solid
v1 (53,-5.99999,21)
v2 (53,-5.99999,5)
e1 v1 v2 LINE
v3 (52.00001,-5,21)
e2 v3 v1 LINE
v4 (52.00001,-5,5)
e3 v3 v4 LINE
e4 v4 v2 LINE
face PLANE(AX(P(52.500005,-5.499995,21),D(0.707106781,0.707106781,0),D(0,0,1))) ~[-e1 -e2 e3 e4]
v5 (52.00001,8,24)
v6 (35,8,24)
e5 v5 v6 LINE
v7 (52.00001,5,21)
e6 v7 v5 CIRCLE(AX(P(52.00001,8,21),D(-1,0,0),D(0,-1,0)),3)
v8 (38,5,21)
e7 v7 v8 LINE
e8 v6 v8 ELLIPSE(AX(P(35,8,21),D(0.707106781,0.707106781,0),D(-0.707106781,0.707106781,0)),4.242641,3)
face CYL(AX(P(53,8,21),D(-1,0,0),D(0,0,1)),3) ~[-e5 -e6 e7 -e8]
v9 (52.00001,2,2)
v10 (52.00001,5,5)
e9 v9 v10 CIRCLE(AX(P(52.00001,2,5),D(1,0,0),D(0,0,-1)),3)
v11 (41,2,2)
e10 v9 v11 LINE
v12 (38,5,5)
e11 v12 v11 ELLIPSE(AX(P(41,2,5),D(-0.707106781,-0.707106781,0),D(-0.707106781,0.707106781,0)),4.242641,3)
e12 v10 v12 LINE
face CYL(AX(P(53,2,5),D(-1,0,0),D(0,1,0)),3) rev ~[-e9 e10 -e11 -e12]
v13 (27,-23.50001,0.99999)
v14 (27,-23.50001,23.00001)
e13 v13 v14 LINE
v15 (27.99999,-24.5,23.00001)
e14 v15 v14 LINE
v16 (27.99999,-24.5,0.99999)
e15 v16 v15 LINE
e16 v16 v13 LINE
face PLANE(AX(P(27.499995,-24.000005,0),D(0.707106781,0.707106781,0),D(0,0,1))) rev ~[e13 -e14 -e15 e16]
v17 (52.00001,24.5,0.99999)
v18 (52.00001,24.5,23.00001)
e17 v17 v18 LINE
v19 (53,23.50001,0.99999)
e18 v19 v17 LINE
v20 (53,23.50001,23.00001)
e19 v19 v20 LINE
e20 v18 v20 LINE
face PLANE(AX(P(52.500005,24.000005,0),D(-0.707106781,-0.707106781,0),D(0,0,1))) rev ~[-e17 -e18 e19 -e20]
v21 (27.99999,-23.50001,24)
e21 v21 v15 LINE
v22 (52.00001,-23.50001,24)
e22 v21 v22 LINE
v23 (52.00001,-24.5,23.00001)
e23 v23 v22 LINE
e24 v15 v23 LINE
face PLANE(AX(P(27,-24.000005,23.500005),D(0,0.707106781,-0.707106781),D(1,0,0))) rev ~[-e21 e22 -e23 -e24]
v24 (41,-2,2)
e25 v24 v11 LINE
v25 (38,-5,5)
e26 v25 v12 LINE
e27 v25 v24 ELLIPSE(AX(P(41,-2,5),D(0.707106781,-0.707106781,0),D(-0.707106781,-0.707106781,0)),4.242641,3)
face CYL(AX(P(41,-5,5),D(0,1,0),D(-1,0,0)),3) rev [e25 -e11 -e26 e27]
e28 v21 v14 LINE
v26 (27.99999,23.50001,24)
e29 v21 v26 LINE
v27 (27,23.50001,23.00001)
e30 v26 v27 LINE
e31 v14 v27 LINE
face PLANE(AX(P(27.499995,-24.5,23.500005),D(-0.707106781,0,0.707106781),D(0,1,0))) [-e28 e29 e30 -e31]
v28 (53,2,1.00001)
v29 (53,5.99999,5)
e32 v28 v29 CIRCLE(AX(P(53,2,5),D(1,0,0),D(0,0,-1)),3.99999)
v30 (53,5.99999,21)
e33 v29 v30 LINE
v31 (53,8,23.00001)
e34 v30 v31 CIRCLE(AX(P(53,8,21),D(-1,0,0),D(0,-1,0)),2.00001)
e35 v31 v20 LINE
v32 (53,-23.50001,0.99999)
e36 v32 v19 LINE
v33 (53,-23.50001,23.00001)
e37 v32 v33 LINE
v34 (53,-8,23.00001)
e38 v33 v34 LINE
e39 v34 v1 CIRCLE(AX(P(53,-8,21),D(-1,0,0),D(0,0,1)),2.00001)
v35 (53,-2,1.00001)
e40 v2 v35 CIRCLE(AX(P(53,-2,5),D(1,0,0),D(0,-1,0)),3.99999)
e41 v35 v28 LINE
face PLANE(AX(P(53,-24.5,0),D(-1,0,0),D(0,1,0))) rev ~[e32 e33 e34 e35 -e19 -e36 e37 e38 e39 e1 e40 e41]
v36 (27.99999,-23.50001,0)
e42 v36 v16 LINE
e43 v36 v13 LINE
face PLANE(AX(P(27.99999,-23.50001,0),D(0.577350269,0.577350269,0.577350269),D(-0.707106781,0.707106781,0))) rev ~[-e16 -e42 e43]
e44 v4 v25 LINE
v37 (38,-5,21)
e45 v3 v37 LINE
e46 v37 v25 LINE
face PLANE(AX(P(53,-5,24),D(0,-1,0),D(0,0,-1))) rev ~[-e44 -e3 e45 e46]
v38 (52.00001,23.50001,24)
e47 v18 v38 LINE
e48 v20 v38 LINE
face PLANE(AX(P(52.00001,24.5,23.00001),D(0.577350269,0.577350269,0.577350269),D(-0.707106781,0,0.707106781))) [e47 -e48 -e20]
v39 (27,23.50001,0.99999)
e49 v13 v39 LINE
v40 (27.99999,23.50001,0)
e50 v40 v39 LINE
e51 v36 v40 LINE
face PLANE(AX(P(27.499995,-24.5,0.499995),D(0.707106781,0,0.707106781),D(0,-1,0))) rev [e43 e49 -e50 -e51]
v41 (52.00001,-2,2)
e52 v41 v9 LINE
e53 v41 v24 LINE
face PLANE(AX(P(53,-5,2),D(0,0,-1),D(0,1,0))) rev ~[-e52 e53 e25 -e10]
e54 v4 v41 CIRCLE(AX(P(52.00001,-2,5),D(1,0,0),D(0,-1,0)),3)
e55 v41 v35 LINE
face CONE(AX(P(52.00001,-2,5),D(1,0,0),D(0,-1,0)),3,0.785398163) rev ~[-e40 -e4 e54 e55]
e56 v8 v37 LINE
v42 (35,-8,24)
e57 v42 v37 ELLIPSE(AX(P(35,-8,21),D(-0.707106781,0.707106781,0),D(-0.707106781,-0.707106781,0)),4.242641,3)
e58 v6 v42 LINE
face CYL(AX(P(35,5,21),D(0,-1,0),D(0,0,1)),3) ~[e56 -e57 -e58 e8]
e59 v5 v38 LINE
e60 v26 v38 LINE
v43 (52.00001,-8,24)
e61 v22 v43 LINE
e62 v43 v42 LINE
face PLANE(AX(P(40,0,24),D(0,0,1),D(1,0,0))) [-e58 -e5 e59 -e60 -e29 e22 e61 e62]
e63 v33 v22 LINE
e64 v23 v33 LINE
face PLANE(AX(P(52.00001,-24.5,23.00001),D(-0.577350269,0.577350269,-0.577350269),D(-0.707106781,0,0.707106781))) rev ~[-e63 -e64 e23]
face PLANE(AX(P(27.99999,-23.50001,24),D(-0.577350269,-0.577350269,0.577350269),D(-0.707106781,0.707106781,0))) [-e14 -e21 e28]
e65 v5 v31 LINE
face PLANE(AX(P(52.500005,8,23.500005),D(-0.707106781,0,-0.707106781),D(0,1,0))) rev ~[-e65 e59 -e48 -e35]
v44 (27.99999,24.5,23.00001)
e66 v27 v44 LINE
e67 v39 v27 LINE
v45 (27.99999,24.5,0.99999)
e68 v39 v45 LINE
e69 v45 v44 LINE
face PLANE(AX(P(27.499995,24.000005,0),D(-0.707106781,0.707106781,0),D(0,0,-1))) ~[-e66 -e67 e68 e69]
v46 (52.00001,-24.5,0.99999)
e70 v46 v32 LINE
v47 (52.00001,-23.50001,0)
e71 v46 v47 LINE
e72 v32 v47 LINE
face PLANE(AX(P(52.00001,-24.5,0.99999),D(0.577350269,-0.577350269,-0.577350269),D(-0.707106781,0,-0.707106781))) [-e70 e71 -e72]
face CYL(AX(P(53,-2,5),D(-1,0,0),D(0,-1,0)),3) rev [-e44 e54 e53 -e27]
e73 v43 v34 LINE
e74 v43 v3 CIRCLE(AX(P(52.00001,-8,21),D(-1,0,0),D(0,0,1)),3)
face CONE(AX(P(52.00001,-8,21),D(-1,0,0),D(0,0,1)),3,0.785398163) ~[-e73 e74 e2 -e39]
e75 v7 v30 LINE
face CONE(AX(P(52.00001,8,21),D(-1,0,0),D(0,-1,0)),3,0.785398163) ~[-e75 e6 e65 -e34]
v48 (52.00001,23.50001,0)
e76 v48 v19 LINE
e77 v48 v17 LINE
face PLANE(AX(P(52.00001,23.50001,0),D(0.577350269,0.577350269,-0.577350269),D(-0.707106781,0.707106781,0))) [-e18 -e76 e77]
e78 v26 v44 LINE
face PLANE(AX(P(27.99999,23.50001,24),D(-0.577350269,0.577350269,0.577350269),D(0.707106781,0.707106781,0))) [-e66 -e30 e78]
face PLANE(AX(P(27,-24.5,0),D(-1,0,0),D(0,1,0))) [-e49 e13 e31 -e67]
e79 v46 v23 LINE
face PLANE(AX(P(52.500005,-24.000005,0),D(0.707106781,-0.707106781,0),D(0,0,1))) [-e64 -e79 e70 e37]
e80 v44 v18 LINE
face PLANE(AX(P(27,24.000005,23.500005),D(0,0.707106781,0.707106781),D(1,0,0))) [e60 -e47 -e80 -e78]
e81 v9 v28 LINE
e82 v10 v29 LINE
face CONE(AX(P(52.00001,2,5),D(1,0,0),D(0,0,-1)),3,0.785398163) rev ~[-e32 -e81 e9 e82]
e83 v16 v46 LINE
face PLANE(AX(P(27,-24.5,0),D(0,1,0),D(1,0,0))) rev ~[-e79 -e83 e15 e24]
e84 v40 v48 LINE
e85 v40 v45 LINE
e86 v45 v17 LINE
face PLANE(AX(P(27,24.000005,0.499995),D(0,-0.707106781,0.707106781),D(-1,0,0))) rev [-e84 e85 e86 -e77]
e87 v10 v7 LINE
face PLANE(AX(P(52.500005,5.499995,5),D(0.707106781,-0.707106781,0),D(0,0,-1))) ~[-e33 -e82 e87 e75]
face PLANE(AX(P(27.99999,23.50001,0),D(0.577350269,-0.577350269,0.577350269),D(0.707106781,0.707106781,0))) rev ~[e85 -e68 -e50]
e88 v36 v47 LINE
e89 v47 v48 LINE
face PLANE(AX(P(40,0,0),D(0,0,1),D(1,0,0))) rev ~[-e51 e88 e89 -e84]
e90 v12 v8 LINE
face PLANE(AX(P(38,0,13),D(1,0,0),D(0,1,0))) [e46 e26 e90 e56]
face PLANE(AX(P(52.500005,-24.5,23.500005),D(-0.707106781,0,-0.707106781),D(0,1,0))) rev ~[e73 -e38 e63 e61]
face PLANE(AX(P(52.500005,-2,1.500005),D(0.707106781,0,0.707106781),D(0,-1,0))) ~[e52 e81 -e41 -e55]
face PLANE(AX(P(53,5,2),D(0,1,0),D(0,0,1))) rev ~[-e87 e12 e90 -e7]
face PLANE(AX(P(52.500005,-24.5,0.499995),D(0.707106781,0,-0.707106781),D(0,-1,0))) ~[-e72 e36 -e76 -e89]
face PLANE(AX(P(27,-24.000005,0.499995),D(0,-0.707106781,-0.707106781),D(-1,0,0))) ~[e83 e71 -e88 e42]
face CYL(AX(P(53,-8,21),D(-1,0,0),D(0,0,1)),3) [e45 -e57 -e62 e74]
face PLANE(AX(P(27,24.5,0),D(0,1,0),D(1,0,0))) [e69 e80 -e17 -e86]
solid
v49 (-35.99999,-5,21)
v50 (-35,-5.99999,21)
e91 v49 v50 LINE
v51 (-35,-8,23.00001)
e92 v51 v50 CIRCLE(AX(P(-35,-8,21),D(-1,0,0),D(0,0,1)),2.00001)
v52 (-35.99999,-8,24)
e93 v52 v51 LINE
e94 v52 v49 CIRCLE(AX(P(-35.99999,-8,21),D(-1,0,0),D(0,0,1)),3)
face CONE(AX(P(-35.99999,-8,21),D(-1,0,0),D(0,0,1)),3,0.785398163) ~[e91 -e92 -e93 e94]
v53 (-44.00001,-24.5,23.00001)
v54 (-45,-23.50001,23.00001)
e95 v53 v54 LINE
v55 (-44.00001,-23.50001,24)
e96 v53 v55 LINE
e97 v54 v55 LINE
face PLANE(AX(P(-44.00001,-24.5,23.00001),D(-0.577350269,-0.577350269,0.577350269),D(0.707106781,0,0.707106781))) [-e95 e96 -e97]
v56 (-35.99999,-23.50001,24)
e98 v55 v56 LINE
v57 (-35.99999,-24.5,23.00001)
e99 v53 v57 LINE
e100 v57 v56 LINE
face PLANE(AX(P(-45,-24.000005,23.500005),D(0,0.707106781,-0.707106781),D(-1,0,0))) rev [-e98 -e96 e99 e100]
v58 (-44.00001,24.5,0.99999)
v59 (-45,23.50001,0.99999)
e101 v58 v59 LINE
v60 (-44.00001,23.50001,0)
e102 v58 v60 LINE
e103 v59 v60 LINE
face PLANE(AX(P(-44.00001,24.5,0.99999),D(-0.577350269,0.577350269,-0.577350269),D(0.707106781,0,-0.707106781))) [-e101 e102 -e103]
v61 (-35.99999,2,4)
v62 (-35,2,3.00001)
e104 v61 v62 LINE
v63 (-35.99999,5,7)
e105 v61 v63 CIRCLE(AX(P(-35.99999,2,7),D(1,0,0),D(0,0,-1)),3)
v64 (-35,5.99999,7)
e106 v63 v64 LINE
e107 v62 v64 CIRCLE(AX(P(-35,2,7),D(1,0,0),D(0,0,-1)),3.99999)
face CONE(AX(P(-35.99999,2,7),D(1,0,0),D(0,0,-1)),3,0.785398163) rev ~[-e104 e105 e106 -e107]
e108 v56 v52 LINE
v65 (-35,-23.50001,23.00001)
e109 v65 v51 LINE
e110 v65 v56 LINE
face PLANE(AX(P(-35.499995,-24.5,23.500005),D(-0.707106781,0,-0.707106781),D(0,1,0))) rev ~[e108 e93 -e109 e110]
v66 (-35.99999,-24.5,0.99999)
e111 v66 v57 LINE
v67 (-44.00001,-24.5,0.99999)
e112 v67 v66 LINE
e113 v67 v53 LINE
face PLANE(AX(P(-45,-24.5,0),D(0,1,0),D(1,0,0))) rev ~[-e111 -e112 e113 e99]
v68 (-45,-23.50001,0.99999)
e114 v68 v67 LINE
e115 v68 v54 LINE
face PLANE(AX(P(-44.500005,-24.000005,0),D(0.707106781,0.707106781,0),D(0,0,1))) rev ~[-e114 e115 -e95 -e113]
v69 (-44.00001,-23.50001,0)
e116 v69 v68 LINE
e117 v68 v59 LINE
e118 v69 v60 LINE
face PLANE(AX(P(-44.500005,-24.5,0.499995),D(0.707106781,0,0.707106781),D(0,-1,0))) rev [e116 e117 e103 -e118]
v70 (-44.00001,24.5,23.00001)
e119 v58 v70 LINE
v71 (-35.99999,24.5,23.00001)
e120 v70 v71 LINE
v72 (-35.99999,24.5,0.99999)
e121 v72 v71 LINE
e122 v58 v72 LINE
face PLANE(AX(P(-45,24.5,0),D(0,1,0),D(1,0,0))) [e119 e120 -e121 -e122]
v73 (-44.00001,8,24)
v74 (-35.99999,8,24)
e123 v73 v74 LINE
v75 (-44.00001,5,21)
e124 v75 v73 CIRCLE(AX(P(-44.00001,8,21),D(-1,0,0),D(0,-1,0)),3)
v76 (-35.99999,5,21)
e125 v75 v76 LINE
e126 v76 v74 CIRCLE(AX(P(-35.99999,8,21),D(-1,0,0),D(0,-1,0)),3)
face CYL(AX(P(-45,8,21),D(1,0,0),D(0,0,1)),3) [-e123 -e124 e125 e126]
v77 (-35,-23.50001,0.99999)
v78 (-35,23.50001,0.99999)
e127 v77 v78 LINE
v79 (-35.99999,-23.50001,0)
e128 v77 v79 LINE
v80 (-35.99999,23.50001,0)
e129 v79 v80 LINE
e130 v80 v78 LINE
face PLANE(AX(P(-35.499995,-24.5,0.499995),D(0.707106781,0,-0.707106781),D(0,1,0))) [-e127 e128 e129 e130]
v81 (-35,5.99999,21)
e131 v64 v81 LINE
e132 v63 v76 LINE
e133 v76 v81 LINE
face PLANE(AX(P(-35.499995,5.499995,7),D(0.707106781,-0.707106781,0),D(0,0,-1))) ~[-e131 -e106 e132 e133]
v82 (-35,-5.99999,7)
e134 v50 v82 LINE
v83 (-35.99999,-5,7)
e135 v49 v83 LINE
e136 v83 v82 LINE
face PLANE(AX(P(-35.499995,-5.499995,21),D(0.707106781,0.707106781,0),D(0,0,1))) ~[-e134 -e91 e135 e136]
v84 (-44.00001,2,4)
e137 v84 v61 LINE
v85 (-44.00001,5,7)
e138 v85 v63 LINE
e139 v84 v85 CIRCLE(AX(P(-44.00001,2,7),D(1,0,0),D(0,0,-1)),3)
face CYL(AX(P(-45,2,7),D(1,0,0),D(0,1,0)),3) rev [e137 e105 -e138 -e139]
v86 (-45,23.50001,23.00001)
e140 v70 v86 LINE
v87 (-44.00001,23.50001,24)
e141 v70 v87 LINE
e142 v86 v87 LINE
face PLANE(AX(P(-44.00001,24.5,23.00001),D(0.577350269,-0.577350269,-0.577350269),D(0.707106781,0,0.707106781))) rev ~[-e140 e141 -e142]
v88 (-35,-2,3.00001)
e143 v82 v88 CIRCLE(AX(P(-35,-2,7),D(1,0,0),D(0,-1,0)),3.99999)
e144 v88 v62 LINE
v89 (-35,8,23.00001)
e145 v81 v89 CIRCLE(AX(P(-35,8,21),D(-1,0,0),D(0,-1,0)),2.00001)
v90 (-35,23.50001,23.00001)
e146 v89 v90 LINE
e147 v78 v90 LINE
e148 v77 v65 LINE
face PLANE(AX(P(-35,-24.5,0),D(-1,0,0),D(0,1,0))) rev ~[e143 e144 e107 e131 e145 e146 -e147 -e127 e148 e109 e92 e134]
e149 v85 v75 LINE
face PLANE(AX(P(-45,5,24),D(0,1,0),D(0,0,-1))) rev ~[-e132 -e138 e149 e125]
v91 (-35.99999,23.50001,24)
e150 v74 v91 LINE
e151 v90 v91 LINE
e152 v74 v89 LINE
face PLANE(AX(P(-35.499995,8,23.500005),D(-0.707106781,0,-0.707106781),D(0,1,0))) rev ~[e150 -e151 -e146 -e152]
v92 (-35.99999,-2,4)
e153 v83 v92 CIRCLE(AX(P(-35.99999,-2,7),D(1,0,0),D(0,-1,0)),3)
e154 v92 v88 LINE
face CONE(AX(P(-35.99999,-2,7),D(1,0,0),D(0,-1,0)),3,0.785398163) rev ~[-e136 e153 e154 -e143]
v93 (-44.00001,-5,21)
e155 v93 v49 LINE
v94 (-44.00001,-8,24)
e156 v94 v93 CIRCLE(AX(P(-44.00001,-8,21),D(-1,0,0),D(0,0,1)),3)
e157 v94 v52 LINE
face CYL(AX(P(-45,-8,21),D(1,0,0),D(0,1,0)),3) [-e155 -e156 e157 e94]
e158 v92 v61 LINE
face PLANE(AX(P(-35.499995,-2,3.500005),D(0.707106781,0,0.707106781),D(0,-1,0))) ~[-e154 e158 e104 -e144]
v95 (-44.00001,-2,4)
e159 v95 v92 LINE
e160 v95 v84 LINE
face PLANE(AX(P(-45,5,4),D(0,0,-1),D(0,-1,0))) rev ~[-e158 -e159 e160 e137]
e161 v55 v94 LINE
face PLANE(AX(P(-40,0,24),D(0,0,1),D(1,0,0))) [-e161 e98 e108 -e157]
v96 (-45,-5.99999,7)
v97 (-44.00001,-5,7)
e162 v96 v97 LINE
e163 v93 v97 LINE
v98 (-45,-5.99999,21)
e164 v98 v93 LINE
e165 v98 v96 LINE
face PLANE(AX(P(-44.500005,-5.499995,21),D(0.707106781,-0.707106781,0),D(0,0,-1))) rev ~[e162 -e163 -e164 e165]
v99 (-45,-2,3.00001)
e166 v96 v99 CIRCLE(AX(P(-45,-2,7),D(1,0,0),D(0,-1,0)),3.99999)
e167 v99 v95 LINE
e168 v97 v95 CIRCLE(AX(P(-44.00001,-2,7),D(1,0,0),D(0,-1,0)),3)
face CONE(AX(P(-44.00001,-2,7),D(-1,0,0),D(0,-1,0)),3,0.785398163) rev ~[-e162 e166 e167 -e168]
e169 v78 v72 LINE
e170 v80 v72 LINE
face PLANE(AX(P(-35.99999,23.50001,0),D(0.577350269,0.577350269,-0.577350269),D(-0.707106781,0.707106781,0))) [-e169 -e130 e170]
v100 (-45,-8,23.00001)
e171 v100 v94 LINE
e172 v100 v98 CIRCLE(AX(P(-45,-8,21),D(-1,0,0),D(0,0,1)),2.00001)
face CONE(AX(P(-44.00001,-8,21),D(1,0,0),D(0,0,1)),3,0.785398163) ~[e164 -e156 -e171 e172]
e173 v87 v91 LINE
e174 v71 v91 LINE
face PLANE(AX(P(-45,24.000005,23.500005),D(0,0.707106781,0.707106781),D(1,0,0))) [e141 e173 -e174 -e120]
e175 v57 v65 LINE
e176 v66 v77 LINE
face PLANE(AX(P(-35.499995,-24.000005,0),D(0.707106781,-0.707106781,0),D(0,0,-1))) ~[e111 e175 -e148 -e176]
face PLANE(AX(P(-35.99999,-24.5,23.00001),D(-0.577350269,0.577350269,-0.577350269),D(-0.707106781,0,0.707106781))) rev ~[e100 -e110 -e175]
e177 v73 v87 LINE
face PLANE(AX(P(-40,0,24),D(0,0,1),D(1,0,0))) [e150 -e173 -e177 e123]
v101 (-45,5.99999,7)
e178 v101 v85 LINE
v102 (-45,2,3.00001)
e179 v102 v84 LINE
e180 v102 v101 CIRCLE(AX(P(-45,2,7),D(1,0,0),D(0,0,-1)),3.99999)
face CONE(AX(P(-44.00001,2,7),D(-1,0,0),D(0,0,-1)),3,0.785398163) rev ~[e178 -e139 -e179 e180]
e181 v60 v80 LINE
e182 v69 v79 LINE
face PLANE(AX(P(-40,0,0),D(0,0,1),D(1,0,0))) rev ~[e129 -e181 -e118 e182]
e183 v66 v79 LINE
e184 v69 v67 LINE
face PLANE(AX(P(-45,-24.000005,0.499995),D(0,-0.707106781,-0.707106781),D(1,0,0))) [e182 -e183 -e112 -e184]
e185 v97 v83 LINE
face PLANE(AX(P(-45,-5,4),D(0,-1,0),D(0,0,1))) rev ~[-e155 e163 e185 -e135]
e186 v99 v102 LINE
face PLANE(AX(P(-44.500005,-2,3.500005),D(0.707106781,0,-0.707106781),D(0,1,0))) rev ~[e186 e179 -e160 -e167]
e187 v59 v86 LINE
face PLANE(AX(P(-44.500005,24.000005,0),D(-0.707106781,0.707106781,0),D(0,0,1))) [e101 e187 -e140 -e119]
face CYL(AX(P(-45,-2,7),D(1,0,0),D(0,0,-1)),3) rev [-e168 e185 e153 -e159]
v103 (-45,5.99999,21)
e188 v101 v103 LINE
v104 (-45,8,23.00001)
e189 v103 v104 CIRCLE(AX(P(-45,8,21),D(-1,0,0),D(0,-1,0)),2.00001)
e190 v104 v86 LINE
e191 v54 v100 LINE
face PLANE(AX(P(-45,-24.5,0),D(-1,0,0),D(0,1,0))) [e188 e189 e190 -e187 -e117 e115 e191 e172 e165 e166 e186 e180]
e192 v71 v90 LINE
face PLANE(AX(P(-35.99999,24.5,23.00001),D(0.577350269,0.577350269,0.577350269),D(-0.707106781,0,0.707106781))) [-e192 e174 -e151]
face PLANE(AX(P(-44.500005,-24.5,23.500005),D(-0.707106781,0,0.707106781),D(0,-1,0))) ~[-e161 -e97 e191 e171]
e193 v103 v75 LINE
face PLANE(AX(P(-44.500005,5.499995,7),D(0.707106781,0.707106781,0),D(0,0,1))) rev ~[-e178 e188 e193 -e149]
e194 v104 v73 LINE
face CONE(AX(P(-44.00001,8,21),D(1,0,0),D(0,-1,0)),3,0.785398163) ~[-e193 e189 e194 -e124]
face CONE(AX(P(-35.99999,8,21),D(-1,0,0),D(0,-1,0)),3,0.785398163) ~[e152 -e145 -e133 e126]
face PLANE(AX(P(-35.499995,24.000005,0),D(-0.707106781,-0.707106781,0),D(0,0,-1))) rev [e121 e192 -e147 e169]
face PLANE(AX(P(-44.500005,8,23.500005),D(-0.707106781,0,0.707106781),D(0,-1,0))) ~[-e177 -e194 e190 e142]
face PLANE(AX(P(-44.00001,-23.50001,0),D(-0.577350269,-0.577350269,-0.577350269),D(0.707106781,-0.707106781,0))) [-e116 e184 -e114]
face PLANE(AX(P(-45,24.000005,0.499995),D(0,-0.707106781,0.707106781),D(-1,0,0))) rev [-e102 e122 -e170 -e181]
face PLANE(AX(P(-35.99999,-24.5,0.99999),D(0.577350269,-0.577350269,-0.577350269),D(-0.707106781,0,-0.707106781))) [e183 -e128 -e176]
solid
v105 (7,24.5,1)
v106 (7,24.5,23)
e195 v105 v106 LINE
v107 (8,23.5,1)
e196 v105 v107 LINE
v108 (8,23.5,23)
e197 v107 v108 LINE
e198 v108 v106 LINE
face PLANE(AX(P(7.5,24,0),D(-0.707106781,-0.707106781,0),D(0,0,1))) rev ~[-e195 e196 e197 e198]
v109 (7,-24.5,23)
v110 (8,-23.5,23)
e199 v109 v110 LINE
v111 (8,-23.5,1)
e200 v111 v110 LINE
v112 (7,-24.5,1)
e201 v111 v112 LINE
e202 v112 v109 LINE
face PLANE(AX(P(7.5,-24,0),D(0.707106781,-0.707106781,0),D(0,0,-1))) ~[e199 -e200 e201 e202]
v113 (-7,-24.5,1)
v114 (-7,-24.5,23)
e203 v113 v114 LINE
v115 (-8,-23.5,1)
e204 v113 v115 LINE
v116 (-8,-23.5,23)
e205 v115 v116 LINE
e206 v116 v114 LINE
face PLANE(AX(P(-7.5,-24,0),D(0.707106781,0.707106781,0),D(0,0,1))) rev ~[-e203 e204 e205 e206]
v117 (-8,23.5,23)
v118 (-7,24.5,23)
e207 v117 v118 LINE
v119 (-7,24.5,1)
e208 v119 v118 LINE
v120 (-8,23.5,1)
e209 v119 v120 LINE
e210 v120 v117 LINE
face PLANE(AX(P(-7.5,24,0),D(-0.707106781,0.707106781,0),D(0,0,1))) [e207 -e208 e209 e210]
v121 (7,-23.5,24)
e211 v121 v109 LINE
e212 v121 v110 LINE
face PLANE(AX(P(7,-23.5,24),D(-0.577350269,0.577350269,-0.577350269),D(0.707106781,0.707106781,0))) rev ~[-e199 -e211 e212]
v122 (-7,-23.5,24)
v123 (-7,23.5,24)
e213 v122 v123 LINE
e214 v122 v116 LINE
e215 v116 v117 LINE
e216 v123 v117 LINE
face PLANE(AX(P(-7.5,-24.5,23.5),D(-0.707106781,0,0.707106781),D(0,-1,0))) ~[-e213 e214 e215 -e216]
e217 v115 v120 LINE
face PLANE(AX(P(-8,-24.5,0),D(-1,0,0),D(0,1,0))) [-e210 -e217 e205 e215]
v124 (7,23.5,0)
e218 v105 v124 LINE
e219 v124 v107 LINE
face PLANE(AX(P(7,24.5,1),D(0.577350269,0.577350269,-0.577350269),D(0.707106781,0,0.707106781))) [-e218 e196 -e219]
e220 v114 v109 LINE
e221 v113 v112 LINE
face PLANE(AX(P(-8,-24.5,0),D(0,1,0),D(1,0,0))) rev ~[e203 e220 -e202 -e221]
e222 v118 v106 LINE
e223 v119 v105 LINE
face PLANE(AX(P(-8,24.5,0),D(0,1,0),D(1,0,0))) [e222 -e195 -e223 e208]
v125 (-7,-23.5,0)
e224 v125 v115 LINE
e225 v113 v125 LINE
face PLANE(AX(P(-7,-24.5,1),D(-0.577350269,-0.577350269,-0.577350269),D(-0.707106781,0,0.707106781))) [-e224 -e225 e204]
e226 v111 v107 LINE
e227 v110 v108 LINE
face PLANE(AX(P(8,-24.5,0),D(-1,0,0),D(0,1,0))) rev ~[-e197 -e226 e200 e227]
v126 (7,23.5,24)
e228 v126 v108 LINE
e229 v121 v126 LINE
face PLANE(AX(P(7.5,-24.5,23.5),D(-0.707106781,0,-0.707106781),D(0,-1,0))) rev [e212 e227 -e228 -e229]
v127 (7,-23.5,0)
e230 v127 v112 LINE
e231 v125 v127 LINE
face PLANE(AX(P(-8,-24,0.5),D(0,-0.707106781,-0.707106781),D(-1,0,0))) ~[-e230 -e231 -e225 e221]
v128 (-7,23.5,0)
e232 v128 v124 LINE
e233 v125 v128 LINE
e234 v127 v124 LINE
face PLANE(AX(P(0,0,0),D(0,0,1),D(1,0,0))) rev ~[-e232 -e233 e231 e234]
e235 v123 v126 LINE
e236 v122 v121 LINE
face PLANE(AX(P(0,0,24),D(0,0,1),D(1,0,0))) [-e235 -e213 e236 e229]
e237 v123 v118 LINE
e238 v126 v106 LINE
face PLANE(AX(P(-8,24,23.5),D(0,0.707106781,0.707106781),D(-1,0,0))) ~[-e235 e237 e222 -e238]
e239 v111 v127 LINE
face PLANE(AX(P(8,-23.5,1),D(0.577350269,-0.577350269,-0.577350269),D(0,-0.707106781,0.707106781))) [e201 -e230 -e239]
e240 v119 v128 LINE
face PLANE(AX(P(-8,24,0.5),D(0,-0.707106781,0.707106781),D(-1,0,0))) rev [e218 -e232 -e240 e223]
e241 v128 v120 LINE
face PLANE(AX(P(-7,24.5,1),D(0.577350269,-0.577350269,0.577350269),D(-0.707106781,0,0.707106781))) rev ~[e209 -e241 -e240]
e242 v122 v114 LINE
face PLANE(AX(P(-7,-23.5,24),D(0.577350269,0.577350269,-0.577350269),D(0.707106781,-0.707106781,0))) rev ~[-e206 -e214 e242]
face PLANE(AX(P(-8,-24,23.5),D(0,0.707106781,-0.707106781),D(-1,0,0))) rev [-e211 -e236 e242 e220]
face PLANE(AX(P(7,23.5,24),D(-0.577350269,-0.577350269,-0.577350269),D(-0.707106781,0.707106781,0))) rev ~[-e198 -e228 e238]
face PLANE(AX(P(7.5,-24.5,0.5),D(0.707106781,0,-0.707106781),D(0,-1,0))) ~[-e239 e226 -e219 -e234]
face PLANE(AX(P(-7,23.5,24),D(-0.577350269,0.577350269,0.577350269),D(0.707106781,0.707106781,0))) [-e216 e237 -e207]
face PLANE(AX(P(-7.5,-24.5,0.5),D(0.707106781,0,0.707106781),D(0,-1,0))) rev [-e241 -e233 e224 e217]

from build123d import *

# Parameters (mm, degrees)
F0_W       = 16
F0_H       = 49
F1_DEPTH   = 24
F2_SIZE    = 1
F0_W_2     = 26
F3_DEPTH   = 24
F5_DEPTH   = 15
F0_W_3     = 10
F6_DEPTH   = 24
F8_DEPTH   = 26
F9_R       = 3
F9_2_R     = 3
F10_SIZE   = 0.99999
F10_2_SIZE = 0.99999


# Not quite as in the source:
# - a fillet or chamfer is up to 0.001 mm smaller than in the source, because OpenCascade refuses the exact size


with BuildPart() as f1:
    # F0 (on Top) → F1 (new body)
    with BuildSketch(Plane.XY):
        Rectangle(F0_W, F0_H)
    extrude(amount=F1_DEPTH)

    # F2
    f2_edges = [f1.edges().sort_by_distance(p)[0] for p in [
        (-8, 0, 0),
        (0, -24.5, 0),
        (8, 0, 0),
        (0, 24.5, 0),
        (8, -24.5, 12),
        (8, 24.5, 12),
        (-8, 24.5, 12),
        (-8, -24.5, 12),
        (-8, 0, 24),
        (0, -24.5, 24),
        (8, 0, 24),
        (0, 24.5, 24),
    ]]
    chamfer(f2_edges, length=F2_SIZE)


with BuildPart() as f3:
    # F0 (on Top) → F3 (new body)
    with BuildSketch(Plane.XY):
        with Locations((40, 0)):
            Rectangle(F0_W_2, F0_H)
    extrude(amount=F3_DEPTH)

    # F4 (on face) → F5 (cut)
    with BuildSketch(Plane.YZ.offset(53)):
        Polygon((-5, 2), (0, 2), (5, 2), (5, 24), (-5, 24), align=None)
    extrude(amount=-F5_DEPTH, mode=Mode.SUBTRACT)

    # F9
    f9_edges = [f3.edges().sort_by_distance(p)[0] for p in [
        (45.5, 5, 2),
        (45.5, -5, 2),
        (38, 0, 2),
        (45.5, 5, 24),
        (38, 0, 24),
        (45.5, -5, 24),
    ]]
    fillet(f9_edges, radius=F9_R)

    # F10 (size 1 in the source; OpenCascade refuses exactly that, so slightly less here)
    f10_edges = [f3.edges().sort_by_distance(p)[0] for p in [
        (53, 16.25, 24),
        (53, 5.87868, 23.12132),
        (53, 24.5, 12),
        (53, 5, 13),
        (53, 0, 0),
        (53, 4.12132, 2.87868),
        (53, -24.5, 12),
        (53, 0, 2),
        (53, -16.25, 24),
        (53, -4.12132, 2.87868),
        (53, -5.87868, 23.12132),
        (53, -5, 13),
        (27, -24.5, 12),
        (40, -24.5, 0),
        (40, -24.5, 24),
        (27, 24.5, 12),
        (27, 0, 0),
        (27, 0, 24),
        (40, 24.5, 0),
        (40, 24.5, 24),
    ]]
    chamfer(f10_edges, length=F10_SIZE)


with BuildPart() as f6:
    # F0 (on Top) → F6 (new body)
    with BuildSketch(Plane.XY):
        with Locations((-40, 0)):
            Rectangle(F0_W_3, F0_H)
    extrude(amount=F6_DEPTH)

    # F7 (on face) → F8 (cut)
    with BuildSketch(Plane(origin=(-45, 0, 0), x_dir=(0, -1, 0), z_dir=(-1, 0, 0))):
        Polygon((-5, 4), (0, 4), (5, 4), (5, 24), (-5, 24), align=None)
    extrude(amount=-F8_DEPTH, mode=Mode.SUBTRACT)

    # F9#2
    f9_2_edges = [f6.edges().sort_by_distance(p)[0] for p in [
        (-40, -5, 4),
        (-40, 5, 4),
        (-40, 5, 24),
        (-40, -5, 24),
    ]]
    fillet(f9_2_edges, radius=F9_2_R)

    # F10#2 (size 1 in the source; OpenCascade refuses exactly that, so slightly less here)
    f10_2_edges = [f6.edges().sort_by_distance(p)[0] for p in [
        (-45, -16.25, 24),
        (-45, -5.87868, 23.12132),
        (-45, -24.5, 12),
        (-45, -5, 14),
        (-45, 0, 0),
        (-45, -4.12132, 4.87868),
        (-45, 24.5, 12),
        (-45, 0, 4),
        (-45, 16.25, 24),
        (-45, 4.12132, 4.87868),
        (-45, 5.87868, 23.12132),
        (-45, 5, 14),
        (-35, 16.25, 24),
        (-35, 5.87868, 23.12132),
        (-35, 24.5, 12),
        (-35, 5, 14),
        (-35, 0, 0),
        (-35, 4.12132, 4.87868),
        (-35, -24.5, 12),
        (-35, 0, 4),
        (-35, -16.25, 24),
        (-35, -4.12132, 4.87868),
        (-35, -5.87868, 23.12132),
        (-35, -5, 14),
        (-40, -24.5, 0),
        (-40, 24.5, 0),
        (-40, 24.5, 24),
        (-40, -24.5, 24),
    ]]
    chamfer(f10_2_edges, length=F10_2_SIZE)


solid = Compound([f1.part, f3.part, f6.part])
